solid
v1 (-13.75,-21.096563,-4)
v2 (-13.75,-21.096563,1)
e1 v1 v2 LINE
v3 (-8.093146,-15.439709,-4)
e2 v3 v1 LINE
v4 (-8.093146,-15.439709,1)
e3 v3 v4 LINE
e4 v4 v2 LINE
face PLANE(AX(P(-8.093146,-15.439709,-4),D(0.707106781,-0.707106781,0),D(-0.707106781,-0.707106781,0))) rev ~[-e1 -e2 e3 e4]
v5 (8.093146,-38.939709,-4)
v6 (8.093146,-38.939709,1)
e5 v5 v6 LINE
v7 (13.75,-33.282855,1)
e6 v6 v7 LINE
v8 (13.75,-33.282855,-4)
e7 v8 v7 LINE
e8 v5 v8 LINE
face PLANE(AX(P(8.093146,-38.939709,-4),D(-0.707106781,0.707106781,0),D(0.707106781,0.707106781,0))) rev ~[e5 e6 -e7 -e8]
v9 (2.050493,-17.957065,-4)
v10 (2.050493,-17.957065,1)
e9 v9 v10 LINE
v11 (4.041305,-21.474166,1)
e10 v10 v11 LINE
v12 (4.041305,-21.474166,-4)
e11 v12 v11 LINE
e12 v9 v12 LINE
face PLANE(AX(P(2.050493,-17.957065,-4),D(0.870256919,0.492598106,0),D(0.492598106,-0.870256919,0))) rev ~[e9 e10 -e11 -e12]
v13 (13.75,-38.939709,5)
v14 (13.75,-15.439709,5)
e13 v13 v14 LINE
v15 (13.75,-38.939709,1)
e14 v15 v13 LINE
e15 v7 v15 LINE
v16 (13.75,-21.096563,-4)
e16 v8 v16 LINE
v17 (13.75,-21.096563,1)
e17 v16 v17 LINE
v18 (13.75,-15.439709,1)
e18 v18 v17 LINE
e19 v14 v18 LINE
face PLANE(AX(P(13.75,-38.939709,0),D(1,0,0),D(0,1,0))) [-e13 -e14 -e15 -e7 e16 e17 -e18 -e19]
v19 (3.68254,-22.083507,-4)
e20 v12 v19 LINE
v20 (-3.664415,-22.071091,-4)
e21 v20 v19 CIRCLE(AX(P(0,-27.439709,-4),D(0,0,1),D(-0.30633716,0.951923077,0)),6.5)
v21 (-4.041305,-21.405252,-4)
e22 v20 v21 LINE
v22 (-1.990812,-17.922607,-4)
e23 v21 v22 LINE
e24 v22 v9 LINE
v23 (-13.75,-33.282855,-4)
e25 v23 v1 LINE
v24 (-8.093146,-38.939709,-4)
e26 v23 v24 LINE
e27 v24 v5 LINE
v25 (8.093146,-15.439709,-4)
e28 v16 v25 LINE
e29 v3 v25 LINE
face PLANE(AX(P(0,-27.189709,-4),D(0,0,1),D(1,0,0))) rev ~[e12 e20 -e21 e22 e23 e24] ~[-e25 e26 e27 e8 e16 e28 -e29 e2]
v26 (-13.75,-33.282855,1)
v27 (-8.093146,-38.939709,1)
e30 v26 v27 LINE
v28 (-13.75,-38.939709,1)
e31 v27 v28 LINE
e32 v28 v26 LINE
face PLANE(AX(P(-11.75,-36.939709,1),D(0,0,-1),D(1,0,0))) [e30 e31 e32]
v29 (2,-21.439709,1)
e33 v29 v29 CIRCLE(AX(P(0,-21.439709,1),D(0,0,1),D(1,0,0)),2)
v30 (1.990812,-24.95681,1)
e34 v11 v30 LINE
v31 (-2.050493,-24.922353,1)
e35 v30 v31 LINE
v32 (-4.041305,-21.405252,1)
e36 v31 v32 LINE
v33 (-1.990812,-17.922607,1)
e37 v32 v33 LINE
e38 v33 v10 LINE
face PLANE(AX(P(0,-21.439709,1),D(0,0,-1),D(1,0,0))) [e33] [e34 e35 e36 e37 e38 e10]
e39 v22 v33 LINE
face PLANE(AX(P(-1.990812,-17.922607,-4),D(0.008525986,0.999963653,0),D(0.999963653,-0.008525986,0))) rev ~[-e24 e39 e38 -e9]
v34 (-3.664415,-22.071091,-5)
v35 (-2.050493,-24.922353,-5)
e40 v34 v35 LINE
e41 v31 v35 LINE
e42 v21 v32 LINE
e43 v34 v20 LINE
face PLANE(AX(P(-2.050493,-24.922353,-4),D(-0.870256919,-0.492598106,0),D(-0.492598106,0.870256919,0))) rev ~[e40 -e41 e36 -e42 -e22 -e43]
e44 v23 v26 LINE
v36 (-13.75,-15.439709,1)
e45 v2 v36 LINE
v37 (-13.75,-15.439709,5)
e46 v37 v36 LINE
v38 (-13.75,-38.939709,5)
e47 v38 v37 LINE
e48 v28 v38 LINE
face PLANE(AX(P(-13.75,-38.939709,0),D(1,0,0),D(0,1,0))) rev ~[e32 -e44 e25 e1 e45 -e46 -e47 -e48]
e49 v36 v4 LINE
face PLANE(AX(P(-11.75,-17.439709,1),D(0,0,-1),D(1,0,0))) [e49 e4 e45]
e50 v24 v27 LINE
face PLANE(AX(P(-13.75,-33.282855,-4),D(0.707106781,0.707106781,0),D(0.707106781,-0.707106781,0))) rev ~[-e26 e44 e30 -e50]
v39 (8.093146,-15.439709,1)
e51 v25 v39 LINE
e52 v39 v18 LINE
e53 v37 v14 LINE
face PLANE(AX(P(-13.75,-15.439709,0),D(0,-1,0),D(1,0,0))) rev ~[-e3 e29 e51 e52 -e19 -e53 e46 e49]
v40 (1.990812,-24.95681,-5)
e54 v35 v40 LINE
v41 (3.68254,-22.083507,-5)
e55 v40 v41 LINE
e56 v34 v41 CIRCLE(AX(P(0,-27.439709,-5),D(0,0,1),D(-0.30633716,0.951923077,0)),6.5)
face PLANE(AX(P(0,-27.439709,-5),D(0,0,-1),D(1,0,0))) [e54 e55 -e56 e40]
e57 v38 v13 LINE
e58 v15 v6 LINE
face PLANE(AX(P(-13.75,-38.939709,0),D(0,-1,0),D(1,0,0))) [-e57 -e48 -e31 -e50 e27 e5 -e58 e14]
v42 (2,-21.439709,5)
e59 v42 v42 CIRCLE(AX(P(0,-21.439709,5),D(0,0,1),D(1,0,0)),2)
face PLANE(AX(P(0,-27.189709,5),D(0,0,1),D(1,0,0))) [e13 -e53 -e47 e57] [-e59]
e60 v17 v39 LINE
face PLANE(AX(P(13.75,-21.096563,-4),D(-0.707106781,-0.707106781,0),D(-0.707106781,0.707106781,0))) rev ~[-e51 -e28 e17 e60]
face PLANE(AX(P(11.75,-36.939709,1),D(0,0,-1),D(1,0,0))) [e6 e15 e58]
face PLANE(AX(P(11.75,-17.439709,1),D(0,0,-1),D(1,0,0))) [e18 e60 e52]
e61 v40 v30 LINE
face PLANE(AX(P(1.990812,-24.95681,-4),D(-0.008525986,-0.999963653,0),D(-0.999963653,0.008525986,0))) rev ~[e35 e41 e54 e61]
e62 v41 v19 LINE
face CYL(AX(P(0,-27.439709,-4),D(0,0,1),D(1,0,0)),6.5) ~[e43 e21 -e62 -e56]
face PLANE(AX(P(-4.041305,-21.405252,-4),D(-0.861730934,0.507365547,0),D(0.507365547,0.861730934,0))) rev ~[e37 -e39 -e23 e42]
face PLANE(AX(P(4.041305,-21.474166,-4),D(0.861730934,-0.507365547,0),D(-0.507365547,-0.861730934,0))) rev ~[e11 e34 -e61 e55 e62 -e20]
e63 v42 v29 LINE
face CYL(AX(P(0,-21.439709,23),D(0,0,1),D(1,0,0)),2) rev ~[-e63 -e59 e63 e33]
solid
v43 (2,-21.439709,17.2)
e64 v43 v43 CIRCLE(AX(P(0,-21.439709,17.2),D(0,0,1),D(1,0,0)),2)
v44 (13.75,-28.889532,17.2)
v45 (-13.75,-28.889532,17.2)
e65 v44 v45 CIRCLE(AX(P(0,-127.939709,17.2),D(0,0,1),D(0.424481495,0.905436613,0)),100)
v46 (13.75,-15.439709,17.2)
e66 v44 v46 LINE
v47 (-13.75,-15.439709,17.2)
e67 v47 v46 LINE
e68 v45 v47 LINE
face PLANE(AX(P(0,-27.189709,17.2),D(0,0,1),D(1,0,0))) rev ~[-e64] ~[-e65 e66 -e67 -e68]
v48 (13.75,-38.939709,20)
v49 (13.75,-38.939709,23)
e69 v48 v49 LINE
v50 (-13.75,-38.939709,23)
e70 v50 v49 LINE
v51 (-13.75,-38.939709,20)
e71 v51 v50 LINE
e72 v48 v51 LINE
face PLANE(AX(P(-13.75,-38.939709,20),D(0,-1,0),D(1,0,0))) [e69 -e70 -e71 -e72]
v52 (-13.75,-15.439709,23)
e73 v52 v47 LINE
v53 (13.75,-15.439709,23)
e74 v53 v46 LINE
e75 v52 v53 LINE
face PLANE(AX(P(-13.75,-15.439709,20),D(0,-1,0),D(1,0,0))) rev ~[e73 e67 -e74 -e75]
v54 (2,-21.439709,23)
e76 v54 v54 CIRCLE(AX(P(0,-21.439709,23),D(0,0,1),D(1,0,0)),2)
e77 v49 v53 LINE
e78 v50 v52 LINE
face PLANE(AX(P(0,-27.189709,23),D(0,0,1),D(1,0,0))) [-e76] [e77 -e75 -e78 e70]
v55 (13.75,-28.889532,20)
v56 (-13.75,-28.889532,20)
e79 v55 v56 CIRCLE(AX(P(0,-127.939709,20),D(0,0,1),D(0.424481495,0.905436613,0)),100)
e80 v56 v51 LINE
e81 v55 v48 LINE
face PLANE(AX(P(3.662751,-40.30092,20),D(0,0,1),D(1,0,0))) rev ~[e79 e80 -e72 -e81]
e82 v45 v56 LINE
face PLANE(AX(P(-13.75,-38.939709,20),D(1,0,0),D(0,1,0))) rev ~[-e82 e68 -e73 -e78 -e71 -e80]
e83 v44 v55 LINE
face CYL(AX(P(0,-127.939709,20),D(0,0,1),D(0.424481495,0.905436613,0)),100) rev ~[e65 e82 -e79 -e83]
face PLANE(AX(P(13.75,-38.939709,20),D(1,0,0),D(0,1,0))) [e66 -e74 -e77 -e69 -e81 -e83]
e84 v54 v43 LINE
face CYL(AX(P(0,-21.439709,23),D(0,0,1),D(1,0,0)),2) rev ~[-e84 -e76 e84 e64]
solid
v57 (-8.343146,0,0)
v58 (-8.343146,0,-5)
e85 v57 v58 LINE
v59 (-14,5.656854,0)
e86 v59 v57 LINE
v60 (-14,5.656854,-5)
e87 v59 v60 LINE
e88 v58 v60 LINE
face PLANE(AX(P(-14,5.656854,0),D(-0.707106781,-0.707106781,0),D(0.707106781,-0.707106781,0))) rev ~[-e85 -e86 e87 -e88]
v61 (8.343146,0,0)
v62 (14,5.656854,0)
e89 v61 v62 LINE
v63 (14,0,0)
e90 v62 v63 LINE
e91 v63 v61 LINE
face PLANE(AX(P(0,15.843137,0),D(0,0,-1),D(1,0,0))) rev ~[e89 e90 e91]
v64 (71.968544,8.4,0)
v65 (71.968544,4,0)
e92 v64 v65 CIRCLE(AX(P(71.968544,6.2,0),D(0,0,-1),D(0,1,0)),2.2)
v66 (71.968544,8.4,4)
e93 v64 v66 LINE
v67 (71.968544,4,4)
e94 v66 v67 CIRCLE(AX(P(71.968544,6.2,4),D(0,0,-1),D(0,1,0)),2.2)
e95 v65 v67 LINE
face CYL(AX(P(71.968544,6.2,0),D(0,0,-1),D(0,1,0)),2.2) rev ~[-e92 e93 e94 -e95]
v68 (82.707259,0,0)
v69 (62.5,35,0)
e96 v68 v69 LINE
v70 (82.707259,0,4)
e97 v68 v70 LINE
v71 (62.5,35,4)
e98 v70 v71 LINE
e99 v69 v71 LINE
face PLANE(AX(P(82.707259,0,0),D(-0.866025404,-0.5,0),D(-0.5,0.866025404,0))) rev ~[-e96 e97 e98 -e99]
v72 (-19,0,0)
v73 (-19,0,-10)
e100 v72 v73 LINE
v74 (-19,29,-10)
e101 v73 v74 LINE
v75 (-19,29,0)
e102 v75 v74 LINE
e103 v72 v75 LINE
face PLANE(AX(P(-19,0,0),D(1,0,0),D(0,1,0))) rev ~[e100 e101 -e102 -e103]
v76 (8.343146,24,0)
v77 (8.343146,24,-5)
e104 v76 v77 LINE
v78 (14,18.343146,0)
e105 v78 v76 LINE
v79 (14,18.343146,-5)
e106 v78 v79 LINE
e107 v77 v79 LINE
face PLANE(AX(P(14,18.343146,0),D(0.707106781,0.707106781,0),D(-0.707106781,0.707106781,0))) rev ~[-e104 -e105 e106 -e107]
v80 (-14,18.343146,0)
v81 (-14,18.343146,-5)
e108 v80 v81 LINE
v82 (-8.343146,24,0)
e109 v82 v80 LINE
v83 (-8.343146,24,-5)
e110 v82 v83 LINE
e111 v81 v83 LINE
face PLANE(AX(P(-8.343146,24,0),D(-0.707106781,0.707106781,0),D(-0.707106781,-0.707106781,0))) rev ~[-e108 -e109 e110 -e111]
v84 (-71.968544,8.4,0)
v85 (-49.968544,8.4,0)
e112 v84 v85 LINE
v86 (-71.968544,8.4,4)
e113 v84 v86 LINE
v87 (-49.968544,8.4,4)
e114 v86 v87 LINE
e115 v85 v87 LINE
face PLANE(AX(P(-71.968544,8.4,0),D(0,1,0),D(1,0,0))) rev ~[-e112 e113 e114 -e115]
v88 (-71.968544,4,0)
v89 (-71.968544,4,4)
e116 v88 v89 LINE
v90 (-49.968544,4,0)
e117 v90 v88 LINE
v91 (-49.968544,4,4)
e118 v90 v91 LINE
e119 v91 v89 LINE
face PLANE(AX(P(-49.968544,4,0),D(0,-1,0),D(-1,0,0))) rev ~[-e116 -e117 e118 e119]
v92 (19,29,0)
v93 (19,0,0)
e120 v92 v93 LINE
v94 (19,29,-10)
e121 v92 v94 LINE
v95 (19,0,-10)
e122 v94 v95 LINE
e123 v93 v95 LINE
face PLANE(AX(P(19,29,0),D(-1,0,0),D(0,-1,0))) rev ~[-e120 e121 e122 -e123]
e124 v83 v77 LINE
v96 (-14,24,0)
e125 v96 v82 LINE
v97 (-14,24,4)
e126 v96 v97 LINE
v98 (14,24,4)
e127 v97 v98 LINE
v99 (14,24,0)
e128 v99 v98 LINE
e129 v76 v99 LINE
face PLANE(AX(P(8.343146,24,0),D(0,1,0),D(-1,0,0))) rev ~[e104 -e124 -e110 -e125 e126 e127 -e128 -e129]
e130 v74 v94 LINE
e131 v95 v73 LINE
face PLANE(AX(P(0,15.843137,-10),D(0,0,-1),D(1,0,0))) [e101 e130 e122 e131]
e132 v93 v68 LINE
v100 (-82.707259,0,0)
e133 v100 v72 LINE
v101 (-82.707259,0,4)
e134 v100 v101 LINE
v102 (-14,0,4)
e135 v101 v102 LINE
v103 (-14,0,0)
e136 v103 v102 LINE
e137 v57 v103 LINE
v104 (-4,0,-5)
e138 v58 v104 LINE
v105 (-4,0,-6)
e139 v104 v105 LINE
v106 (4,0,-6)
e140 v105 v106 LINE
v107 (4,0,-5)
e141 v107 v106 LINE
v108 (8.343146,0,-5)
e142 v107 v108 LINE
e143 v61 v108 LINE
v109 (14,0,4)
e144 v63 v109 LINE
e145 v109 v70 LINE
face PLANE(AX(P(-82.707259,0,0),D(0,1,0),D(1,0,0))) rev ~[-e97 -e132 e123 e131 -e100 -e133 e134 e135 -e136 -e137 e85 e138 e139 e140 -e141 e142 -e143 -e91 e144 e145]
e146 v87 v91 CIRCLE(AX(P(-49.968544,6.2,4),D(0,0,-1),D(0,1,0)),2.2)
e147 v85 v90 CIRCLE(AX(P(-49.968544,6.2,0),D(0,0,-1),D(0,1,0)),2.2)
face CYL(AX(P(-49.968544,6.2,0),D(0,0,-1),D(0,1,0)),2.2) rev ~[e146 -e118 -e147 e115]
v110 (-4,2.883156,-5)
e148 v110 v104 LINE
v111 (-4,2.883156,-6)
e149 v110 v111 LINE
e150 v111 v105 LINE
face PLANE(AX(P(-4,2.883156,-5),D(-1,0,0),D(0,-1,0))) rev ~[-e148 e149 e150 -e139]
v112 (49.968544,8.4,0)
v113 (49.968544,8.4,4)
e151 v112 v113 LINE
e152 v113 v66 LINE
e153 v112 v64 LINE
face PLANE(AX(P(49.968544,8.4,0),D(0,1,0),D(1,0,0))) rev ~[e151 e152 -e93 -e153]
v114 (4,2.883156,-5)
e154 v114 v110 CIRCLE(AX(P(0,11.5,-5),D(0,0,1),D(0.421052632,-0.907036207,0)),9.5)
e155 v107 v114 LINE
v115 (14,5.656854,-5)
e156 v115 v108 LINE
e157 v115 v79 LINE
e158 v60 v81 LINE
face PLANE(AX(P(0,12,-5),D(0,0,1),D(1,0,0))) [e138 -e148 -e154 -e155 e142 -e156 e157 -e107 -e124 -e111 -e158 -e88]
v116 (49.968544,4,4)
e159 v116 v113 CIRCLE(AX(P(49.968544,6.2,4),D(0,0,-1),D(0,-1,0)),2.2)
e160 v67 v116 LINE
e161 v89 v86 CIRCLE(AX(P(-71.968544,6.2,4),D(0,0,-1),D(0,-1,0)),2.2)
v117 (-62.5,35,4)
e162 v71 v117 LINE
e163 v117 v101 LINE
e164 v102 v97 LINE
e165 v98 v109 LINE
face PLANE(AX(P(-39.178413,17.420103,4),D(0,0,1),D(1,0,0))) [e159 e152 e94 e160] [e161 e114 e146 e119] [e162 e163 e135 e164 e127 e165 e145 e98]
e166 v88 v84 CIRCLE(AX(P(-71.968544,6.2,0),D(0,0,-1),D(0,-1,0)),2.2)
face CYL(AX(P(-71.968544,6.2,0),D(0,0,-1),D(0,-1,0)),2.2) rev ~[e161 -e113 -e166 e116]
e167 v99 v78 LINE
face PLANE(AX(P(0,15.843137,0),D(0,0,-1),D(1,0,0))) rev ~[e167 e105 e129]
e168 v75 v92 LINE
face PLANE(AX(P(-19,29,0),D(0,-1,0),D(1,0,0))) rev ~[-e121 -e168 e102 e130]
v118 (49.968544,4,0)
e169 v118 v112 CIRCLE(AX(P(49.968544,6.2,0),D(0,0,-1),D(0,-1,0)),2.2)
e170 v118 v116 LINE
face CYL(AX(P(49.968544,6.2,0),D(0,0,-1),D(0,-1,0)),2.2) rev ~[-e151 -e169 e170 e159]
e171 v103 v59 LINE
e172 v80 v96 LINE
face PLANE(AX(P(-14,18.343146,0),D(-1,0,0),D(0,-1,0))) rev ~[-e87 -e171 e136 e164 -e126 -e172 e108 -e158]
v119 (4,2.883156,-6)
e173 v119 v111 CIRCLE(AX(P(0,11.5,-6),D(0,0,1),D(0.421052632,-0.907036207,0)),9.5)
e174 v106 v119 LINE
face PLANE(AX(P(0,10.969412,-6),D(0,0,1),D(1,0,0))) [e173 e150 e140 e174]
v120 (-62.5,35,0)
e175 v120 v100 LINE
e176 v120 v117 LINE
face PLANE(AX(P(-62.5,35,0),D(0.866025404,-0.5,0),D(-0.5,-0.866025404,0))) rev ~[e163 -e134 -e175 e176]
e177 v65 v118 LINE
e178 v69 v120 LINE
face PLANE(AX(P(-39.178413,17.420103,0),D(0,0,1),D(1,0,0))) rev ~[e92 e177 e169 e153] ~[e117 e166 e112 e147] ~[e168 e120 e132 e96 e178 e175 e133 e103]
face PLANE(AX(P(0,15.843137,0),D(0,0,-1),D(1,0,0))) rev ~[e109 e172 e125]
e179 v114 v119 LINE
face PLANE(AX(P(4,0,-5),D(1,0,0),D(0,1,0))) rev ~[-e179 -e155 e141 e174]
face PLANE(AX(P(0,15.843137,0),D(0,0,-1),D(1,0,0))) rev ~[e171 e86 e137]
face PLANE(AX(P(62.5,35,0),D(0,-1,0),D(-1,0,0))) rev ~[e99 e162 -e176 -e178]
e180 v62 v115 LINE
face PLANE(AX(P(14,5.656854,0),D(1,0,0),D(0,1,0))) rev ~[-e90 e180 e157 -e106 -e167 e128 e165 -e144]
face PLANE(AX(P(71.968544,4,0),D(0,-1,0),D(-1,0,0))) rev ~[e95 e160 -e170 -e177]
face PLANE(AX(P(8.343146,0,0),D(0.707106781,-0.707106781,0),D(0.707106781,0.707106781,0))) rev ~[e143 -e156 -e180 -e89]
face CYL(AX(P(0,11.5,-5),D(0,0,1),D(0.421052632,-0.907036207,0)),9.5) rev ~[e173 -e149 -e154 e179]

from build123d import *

# Parameters (mm, degrees)
F1_DEPTH       = 4
F3_DEPTH       = 10
F6_W           = 28
F6_H           = 24
F7_DEPTH       = 5
F8_DEPTH       = 1
F9_W           = 27.5
F9_H           = 23.5
F10_DEPTH      = 5
F10_DEPTH_BACK = 4
F11_R          = 6.5
F12_DEPTH      = 1
F14_DEPTH      = 5
F16_W          = 27.5
F16_H          = 23.5
F17_DEPTH      = 3
F17_DEPTH_BACK = 2.8
F18_R          = 2
F19_DEPTH      = 50
F21_DEPTH      = 5
F21_DEPTH_BACK = 2
F23_DEPTH      = 25


with BuildPart() as f1:
    # F0 (on Top) → F1 (new body)
    with BuildSketch(Plane.XY):
        Polygon((-14, 35), (-62.5, 35), (-82.7072594216, 0), (-62.5, 0), (-14, 0), (-14, 24), (0, 24), (0, 35), align=None)
        with BuildLine():
            ThreePointArc((-49.9685444147, 8.4), (-47.7685444147, 6.2), (-49.9685444147, 4))
            Line((-49.9685444147, 4), (-71.9685444147, 4))
            ThreePointArc((-71.9685444147, 4), (-74.1685444147, 6.2), (-71.9685444147, 8.4))
            Line((-71.9685444147, 8.4), (-49.9685444147, 8.4))
        make_face(mode=Mode.SUBTRACT)
        Polygon((14, 35), (0, 35), (0, 24), (14, 24), (14, 0), (62.5, 0), (82.7072594216, 0), (62.5, 35), align=None)
        with BuildLine():
            Line((71.9685444147, 4), (49.9685444147, 4))
            ThreePointArc((49.9685444147, 4), (47.7685444147, 6.2), (49.9685444147, 8.4))
            Line((49.9685444147, 8.4), (71.9685444147, 8.4))
            ThreePointArc((71.9685444147, 8.4), (74.1685444147, 6.2), (71.9685444147, 4))
        make_face(mode=Mode.SUBTRACT)
    extrude(amount=F1_DEPTH)

    # F2 (on face) → F3 (join)
    with BuildSketch(Plane(origin=(0, 0, 0), x_dir=(1, 0, 0), z_dir=(0, 0, -1))):
        Polygon((19, -29), (19, 0), (14, 0), (8.3431457505, 0), (14, -5.6568542495), (14, -18.3431457505), (8.3431457505, -24), (-8.3431457505, -24), (-14, -18.3431457505), (-14, -5.6568542495), (-8.3431457505, 0), (-14, 0), (-19, 0), (-19, -29), align=None)
    extrude(amount=F3_DEPTH)

    # F6 (on offset) → F7 (join)
    with BuildSketch(Plane.XY.offset(-5)):
        with Locations((0, 12)):
            Rectangle(F6_W, F6_H)
    extrude(amount=-F7_DEPTH)

    # F5 (on offset) → F8 (cut)
    with BuildSketch(Plane.XY.offset(-5)):
        with BuildLine():
            ThreePointArc((4, 2.8831560302), (8.007808689, 6.3887379249), (9.5, 11.5))
            ThreePointArc((9.5, 11.5), (-5.1112620751, 19.507808689), (-4, 2.8831560302))
            ThreePointArc((-4, 2.8831560302), (0, 2), (4, 2.8831560302))
        make_face()
        with BuildLine():
            ThreePointArc((4, 2.8831560302), (0, 2), (-4, 2.8831560302))
            Line((-4, 2.8831560302), (-4, 0))
            Line((-4, 0), (4, 0))
            Line((4, 0), (4, 2.8831560302))
        make_face()
    extrude(amount=-F8_DEPTH, mode=Mode.SUBTRACT)


with BuildPart() as f10:
    # F9 (on Top) → F10 (new body, two sides)
    with BuildSketch(Plane.XY) as f10_sk:
        with Locations((0, -27.1897088677)):
            Rectangle(F9_W, F9_H)
    extrude(amount=F10_DEPTH)
    extrude(f10_sk.sketch, amount=-F10_DEPTH_BACK)

    # F11 (on face) → F12 (join)
    with BuildSketch(Plane(origin=(0, 0, -4), x_dir=(1, 0, 0), z_dir=(0, 0, -1))):
        with Locations((0, 27.4397088677)):
            Circle(F11_R)
    extrude(amount=F12_DEPTH)

    # F13 (on face) → F14 (cut)
    with BuildSketch(Plane(origin=(0, 0, -4), x_dir=(1, 0, 0), z_dir=(0, 0, -1))):
        Polygon((8.0931457505, 15.4397088677), (13.75, 15.4397088677), (13.75, 21.0965631172), align=None)
        Polygon((8.0931457505, 38.9397088677), (13.75, 33.2828546182), (13.75, 38.9397088677), align=None)
        Polygon((-13.75, 33.2828546182), (-8.0931457505, 38.9397088677), (-13.75, 38.9397088677), align=None)
        Polygon((-13.75, 21.0965631172), (-13.75, 15.4397088677), (-8.0931457505, 15.4397088677), align=None)
    extrude(amount=-F14_DEPTH, mode=Mode.SUBTRACT)


with BuildPart() as f17:
    # F16 (on offset) → F17 (new body, two sides)
    with BuildSketch(Plane.XY.offset(20)) as f17_sk:
        with Locations((0, -27.1897088677)):
            Rectangle(F16_W, F16_H)
    extrude(amount=F17_DEPTH)
    extrude(f17_sk.sketch, amount=-F17_DEPTH_BACK)


with BuildPart() as f19_tool:
    # F18 (on face) → F19 (new body)
    with BuildSketch(Plane.XY.offset(23)):
        with Locations((0, -21.4397088677)):
            Circle(F18_R)
    extrude(amount=-F19_DEPTH)


with BuildPart() as f10_1:
    add(f10.part)

    # F19: cut by f19_tool
    add(f19_tool.part, mode=Mode.SUBTRACT)

    # F20 (on face) → F21 (cut, two sides)
    with BuildSketch(Plane(origin=(0, 0, -4), x_dir=(1, 0, 0), z_dir=(0, 0, -1))) as f21_sk:
        Polygon((-2.050493445, 24.9223529732), (-4.0413049902, 21.4052515068), (-1.9908115452, 17.9226074013), (2.050493445, 17.9570647623), (4.0413049902, 21.4741662287), (1.9908115452, 24.9568103341), align=None)
    extrude(amount=-F21_DEPTH, mode=Mode.SUBTRACT)
    extrude(f21_sk.sketch, amount=F21_DEPTH_BACK, mode=Mode.SUBTRACT)


with BuildPart() as f17_1:
    add(f17.part)

    # F19: cut by f19_tool
    add(f19_tool.part, mode=Mode.SUBTRACT)

    # F22 (on offset) → F23 (cut)
    with BuildSketch(Plane.XY.offset(20)):
        with BuildLine():
            Line((34.0421833098, -52.062548697), (42.4481494773, -37.3960475437))
            ThreePointArc((42.4481494773, -37.3960475437), (3.0553431563, -27.9863953749), (-36.838641718, -34.9724324939))
            Line((-36.838641718, -34.9724324939), (-14.8230902851, -51.8119819462))
            Line((-14.8230902851, -51.8119819462), (34.0421833098, -52.062548697))
        make_face()
    extrude(amount=-F23_DEPTH, mode=Mode.SUBTRACT)


solid = Compound([f1.part, f10_1.part, f17_1.part])
